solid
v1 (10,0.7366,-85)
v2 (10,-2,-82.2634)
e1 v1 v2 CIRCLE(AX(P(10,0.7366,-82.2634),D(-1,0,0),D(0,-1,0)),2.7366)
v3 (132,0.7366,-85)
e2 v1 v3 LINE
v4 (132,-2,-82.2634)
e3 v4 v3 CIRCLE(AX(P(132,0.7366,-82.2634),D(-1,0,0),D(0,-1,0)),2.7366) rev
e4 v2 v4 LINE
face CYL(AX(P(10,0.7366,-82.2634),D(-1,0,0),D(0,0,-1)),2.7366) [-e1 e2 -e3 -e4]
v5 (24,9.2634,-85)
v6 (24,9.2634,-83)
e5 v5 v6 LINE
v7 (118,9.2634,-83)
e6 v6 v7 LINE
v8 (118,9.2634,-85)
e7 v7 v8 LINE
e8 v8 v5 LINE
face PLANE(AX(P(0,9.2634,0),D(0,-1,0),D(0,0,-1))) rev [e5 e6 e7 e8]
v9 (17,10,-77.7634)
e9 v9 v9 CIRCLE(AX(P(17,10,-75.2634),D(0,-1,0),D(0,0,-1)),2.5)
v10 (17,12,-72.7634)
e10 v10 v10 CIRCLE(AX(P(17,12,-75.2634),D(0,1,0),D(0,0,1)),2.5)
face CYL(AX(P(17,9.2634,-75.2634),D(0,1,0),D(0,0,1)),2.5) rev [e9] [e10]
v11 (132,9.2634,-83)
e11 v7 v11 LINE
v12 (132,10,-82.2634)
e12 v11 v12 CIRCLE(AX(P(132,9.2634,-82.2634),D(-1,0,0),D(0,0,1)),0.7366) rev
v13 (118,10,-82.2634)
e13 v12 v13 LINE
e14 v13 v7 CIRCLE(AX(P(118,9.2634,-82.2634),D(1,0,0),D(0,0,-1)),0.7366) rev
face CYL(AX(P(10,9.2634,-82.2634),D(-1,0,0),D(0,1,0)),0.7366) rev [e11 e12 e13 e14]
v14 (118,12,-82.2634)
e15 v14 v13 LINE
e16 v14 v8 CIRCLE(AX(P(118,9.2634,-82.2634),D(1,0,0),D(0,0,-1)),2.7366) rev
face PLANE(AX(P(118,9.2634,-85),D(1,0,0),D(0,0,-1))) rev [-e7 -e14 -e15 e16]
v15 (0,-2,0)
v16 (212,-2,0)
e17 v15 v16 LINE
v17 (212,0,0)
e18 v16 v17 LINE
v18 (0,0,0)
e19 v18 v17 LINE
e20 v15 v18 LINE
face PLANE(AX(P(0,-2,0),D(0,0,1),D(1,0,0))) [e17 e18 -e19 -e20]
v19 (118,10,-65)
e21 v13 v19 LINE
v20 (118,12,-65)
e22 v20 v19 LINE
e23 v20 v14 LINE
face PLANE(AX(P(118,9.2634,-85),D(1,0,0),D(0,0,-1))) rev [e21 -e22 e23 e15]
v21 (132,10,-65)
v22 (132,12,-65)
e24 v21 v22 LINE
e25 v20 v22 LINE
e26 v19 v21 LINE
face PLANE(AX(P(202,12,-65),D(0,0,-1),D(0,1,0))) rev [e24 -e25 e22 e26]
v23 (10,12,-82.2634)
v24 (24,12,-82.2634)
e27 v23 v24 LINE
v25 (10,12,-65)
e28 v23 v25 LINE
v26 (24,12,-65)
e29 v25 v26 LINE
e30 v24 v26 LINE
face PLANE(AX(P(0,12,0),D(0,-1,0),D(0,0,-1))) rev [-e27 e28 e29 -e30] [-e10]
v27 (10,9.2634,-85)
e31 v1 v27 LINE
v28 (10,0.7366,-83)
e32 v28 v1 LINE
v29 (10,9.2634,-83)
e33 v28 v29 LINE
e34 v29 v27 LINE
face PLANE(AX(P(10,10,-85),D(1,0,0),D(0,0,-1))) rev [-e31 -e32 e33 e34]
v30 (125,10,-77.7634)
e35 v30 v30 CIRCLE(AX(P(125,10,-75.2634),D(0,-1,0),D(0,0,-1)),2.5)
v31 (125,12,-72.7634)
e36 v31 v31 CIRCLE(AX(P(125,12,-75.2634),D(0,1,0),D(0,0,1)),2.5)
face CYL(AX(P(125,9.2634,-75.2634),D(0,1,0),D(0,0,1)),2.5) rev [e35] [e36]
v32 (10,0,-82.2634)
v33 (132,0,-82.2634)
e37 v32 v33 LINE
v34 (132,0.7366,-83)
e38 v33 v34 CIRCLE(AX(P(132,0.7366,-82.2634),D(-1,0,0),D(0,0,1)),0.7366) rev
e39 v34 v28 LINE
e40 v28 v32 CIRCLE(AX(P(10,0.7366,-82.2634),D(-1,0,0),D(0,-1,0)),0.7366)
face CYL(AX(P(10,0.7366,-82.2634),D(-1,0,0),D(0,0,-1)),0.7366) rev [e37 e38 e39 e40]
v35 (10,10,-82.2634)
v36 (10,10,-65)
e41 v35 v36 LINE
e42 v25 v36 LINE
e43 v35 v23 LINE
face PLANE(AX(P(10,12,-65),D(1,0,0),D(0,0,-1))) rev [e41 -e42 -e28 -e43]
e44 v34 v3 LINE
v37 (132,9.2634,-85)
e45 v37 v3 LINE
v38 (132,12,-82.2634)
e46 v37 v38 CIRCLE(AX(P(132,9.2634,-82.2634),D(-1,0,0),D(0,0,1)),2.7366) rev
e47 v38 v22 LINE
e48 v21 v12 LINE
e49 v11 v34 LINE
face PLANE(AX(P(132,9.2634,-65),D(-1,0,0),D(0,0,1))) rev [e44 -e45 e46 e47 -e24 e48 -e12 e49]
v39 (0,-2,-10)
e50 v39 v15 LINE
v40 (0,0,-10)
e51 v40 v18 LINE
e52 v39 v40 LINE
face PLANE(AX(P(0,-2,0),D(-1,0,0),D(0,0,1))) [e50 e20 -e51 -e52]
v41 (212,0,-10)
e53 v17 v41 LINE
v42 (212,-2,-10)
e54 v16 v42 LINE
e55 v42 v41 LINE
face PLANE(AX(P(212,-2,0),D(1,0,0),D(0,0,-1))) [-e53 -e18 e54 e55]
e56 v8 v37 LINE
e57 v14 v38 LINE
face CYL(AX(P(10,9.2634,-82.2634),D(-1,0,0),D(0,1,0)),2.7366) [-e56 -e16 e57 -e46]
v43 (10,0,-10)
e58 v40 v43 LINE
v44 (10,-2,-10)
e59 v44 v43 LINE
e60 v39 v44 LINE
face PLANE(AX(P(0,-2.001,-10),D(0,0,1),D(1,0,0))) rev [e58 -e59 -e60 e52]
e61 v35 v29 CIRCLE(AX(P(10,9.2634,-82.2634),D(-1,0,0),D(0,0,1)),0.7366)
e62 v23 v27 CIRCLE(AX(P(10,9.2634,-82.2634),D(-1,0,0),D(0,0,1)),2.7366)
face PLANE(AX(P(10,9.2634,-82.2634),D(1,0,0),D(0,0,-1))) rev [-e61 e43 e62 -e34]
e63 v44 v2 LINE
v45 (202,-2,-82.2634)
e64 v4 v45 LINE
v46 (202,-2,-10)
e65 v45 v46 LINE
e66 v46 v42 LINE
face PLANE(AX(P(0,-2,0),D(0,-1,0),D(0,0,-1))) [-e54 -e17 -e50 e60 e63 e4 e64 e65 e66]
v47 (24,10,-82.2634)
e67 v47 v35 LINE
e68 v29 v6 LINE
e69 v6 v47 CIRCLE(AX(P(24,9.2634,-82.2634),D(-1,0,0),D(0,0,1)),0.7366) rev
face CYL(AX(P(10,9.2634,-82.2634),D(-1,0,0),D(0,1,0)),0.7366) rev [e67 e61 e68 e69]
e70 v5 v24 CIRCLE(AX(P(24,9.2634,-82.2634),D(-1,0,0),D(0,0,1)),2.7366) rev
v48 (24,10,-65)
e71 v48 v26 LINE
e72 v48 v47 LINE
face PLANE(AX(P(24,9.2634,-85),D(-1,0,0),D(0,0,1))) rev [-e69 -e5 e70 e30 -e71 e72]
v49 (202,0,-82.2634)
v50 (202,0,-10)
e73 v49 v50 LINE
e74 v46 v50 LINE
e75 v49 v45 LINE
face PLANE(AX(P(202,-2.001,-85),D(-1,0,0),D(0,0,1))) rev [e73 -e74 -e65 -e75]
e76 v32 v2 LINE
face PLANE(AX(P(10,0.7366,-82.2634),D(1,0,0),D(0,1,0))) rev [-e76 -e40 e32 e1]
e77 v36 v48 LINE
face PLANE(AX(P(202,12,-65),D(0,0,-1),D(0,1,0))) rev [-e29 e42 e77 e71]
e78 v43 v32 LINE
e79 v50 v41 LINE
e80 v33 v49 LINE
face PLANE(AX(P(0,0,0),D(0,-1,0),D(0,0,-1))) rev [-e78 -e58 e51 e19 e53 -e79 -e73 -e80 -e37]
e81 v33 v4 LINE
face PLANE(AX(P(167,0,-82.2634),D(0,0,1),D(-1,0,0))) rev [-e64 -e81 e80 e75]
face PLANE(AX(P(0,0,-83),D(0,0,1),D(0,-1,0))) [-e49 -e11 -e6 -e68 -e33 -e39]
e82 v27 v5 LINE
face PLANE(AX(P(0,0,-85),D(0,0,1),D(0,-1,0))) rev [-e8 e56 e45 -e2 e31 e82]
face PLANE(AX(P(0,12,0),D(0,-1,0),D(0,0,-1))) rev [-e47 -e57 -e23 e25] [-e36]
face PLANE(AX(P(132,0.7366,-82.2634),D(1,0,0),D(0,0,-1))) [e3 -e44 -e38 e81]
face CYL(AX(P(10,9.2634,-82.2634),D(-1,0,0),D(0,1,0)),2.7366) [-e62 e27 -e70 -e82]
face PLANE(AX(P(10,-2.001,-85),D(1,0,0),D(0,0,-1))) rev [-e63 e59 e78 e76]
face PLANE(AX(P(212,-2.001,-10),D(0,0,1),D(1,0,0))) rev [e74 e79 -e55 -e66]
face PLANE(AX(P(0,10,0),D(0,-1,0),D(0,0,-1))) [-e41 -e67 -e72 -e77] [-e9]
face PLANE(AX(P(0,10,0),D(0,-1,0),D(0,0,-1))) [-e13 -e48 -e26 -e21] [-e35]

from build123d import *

# Parameters (mm, degrees)
SKETCH1_W                    = 212
SKETCH1_H                    = 85
BASE_FLANGE1_DEPTH           = 2
CUT_EXTRUDE1_REACH           = 230.414
SKETCH6_W                    = 10
SKETCH6_H                    = 75
EDGE_FLANGE1_STRIP_W         = 9.4732
EDGE_FLANGE1_STRIP_H         = 2
EDGE_FLANGE1_STRIP_CUT_DEPTH = 192
EDGE_FLANGE1_DEPTH           = 192
EDGE_FLANGE2_STRIP_W         = 9.4732
EDGE_FLANGE2_STRIP_H         = 2
EDGE_FLANGE2_STRIP_CUT_DEPTH = 192
EDGE_FLANGE2_DEPTH           = 192
CUT_EXTRUDE2_START           = -2.7366
SKETCH13_R                   = 2.5
SKETCH13_W                   = 70
SKETCH13_H                   = 20
SKETCH13_W_2                 = 94
CUT_EXTRUDE2_DEPTH           = 2.7366
CUT_EXTRUDE3_START           = -2.7366
SKETCH14_W                   = 70
SKETCH14_H                   = 11.2634
CUT_EXTRUDE3_DEPTH           = 2.7366


# Sheet-metal steps are written as plain solids
with BuildPart() as part:
    # Sketch1 → Base-Flange1 (new body)
    with BuildSketch(Plane(origin=(0, 0, 0), x_dir=(1, 0, 0), z_dir=(0, 1, 0))):
        with Locations((106, 42.5)):
            Rectangle(SKETCH1_W, SKETCH1_H)
    extrude(amount=-BASE_FLANGE1_DEPTH)

    # Sketch6 → Cut-Extrude1 (cut, up to next)
    with BuildSketch(Plane(origin=(0, 0, 0), x_dir=(1, 0, 0), z_dir=(0, 1, 0)), mode=Mode.PRIVATE) as cut_extrude1_sk1:
        with Locations((5, 47.5)):
            Rectangle(SKETCH6_W, SKETCH6_H)
    cut_extrude1_tool1 = extrude(cut_extrude1_sk1.sketch, amount=-CUT_EXTRUDE1_REACH, mode=Mode.PRIVATE) & part.part
    # Sketch6 → Cut-Extrude1 (cut, up to next)
    with BuildSketch(Plane(origin=(0, 0, 0), x_dir=(1, 0, 0), z_dir=(0, 1, 0)), mode=Mode.PRIVATE) as cut_extrude1_sk2:
        with Locations((207, 47.5)):
            Rectangle(SKETCH6_W, SKETCH6_H)
    cut_extrude1_tool2 = extrude(cut_extrude1_sk2.sketch, amount=-CUT_EXTRUDE1_REACH, mode=Mode.PRIVATE) & part.part
    add(cut_extrude1_tool1.solids().sort_by_distance((5, 0, -47.5))[0], mode=Mode.SUBTRACT)
    add(cut_extrude1_tool2.solids().sort_by_distance((207, 0, -47.5))[0], mode=Mode.SUBTRACT)

    # Edge-Flange1 strip (across the edge) → Edge-Flange1 strip cut (cut)
    with BuildSketch(Plane(origin=(202, 0, -85), x_dir=(0, 0, 1), z_dir=(-1, 0, 0))):
        with Locations((-2, -1)):
            Rectangle(EDGE_FLANGE1_STRIP_W, EDGE_FLANGE1_STRIP_H)
    extrude(amount=EDGE_FLANGE1_STRIP_CUT_DEPTH, mode=Mode.SUBTRACT)

    # Edge-Flange1 section (across the edge) → Edge-Flange1 (add)
    with BuildSketch(Plane(origin=(202, 0, -85), x_dir=(0, 0, 1), z_dir=(-1, 0, 0))):
        with BuildLine():
            Line((0, 0.7366), (0, 10))
            Line((0, 10), (2, 10))
            Line((2, 10), (2, 0.7366))
            ThreePointArc((2, 0.7366), (2.215745145, 0.215745145), (2.7366, 0))
            Line((2.7366, 0), (2.7366, -2))
            ThreePointArc((2.7366, -2), (0.801531583, -1.198468417), (0, 0.7366))
        make_face()
    extrude(amount=EDGE_FLANGE1_DEPTH)

    # Edge-Flange2 strip (across the edge) → Edge-Flange2 strip cut (cut)
    with BuildSketch(Plane(origin=(202, 10, -83), x_dir=(0, -1, 0), z_dir=(-1, 0, 0))):
        with Locations((-4, -1)):
            Rectangle(EDGE_FLANGE2_STRIP_W, EDGE_FLANGE2_STRIP_H)
    extrude(amount=EDGE_FLANGE2_STRIP_CUT_DEPTH, mode=Mode.SUBTRACT)

    # Edge-Flange2 section (across the edge) → Edge-Flange2 (add)
    with BuildSketch(Plane(origin=(202, 10, -83), x_dir=(0, -1, 0), z_dir=(-1, 0, 0))):
        with BuildLine():
            Line((-2, 0.7366), (-2, 18))
            Line((-2, 18), (0, 18))
            Line((0, 18), (0, 0.7366))
            ThreePointArc((0, 0.7366), (0.215745145, 0.215745145), (0.7366, 0))
            Line((0.7366, 0), (0.7366, -2))
            ThreePointArc((0.7366, -2), (-1.198468417, -1.198468417), (-2, 0.7366))
        make_face()
    extrude(amount=EDGE_FLANGE2_DEPTH)

    # Sketch13 → Cut-Extrude2 (cut)
    with BuildSketch(Plane(origin=(0, 12, 0), x_dir=(1, 0, 0), z_dir=(0, 1, 0)).offset(CUT_EXTRUDE2_START)):
        with Locations(Location((125, 75.2634, 0), (0, 0, 270))):
            Circle(SKETCH13_R)
        with Locations(Location((17, 75.2634, 0), (0, 0, 270))):
            Circle(SKETCH13_R)
        with Locations((167, 75)):
            Rectangle(SKETCH13_W, SKETCH13_H)
        with Locations((71, 75)):
            Rectangle(SKETCH13_W_2, SKETCH13_H)
    extrude(amount=CUT_EXTRUDE2_DEPTH, mode=Mode.SUBTRACT)

    # Sketch14 → Cut-Extrude3 (cut)
    with BuildSketch(Plane(origin=(0, 0, -85), x_dir=(-1, 0, 0), z_dir=(0, 0, -1)).offset(CUT_EXTRUDE3_START)):
        with Locations((-167, 3.6317)):
            Rectangle(SKETCH14_W, SKETCH14_H)
    extrude(amount=CUT_EXTRUDE3_DEPTH, mode=Mode.SUBTRACT)


solid = part.part
